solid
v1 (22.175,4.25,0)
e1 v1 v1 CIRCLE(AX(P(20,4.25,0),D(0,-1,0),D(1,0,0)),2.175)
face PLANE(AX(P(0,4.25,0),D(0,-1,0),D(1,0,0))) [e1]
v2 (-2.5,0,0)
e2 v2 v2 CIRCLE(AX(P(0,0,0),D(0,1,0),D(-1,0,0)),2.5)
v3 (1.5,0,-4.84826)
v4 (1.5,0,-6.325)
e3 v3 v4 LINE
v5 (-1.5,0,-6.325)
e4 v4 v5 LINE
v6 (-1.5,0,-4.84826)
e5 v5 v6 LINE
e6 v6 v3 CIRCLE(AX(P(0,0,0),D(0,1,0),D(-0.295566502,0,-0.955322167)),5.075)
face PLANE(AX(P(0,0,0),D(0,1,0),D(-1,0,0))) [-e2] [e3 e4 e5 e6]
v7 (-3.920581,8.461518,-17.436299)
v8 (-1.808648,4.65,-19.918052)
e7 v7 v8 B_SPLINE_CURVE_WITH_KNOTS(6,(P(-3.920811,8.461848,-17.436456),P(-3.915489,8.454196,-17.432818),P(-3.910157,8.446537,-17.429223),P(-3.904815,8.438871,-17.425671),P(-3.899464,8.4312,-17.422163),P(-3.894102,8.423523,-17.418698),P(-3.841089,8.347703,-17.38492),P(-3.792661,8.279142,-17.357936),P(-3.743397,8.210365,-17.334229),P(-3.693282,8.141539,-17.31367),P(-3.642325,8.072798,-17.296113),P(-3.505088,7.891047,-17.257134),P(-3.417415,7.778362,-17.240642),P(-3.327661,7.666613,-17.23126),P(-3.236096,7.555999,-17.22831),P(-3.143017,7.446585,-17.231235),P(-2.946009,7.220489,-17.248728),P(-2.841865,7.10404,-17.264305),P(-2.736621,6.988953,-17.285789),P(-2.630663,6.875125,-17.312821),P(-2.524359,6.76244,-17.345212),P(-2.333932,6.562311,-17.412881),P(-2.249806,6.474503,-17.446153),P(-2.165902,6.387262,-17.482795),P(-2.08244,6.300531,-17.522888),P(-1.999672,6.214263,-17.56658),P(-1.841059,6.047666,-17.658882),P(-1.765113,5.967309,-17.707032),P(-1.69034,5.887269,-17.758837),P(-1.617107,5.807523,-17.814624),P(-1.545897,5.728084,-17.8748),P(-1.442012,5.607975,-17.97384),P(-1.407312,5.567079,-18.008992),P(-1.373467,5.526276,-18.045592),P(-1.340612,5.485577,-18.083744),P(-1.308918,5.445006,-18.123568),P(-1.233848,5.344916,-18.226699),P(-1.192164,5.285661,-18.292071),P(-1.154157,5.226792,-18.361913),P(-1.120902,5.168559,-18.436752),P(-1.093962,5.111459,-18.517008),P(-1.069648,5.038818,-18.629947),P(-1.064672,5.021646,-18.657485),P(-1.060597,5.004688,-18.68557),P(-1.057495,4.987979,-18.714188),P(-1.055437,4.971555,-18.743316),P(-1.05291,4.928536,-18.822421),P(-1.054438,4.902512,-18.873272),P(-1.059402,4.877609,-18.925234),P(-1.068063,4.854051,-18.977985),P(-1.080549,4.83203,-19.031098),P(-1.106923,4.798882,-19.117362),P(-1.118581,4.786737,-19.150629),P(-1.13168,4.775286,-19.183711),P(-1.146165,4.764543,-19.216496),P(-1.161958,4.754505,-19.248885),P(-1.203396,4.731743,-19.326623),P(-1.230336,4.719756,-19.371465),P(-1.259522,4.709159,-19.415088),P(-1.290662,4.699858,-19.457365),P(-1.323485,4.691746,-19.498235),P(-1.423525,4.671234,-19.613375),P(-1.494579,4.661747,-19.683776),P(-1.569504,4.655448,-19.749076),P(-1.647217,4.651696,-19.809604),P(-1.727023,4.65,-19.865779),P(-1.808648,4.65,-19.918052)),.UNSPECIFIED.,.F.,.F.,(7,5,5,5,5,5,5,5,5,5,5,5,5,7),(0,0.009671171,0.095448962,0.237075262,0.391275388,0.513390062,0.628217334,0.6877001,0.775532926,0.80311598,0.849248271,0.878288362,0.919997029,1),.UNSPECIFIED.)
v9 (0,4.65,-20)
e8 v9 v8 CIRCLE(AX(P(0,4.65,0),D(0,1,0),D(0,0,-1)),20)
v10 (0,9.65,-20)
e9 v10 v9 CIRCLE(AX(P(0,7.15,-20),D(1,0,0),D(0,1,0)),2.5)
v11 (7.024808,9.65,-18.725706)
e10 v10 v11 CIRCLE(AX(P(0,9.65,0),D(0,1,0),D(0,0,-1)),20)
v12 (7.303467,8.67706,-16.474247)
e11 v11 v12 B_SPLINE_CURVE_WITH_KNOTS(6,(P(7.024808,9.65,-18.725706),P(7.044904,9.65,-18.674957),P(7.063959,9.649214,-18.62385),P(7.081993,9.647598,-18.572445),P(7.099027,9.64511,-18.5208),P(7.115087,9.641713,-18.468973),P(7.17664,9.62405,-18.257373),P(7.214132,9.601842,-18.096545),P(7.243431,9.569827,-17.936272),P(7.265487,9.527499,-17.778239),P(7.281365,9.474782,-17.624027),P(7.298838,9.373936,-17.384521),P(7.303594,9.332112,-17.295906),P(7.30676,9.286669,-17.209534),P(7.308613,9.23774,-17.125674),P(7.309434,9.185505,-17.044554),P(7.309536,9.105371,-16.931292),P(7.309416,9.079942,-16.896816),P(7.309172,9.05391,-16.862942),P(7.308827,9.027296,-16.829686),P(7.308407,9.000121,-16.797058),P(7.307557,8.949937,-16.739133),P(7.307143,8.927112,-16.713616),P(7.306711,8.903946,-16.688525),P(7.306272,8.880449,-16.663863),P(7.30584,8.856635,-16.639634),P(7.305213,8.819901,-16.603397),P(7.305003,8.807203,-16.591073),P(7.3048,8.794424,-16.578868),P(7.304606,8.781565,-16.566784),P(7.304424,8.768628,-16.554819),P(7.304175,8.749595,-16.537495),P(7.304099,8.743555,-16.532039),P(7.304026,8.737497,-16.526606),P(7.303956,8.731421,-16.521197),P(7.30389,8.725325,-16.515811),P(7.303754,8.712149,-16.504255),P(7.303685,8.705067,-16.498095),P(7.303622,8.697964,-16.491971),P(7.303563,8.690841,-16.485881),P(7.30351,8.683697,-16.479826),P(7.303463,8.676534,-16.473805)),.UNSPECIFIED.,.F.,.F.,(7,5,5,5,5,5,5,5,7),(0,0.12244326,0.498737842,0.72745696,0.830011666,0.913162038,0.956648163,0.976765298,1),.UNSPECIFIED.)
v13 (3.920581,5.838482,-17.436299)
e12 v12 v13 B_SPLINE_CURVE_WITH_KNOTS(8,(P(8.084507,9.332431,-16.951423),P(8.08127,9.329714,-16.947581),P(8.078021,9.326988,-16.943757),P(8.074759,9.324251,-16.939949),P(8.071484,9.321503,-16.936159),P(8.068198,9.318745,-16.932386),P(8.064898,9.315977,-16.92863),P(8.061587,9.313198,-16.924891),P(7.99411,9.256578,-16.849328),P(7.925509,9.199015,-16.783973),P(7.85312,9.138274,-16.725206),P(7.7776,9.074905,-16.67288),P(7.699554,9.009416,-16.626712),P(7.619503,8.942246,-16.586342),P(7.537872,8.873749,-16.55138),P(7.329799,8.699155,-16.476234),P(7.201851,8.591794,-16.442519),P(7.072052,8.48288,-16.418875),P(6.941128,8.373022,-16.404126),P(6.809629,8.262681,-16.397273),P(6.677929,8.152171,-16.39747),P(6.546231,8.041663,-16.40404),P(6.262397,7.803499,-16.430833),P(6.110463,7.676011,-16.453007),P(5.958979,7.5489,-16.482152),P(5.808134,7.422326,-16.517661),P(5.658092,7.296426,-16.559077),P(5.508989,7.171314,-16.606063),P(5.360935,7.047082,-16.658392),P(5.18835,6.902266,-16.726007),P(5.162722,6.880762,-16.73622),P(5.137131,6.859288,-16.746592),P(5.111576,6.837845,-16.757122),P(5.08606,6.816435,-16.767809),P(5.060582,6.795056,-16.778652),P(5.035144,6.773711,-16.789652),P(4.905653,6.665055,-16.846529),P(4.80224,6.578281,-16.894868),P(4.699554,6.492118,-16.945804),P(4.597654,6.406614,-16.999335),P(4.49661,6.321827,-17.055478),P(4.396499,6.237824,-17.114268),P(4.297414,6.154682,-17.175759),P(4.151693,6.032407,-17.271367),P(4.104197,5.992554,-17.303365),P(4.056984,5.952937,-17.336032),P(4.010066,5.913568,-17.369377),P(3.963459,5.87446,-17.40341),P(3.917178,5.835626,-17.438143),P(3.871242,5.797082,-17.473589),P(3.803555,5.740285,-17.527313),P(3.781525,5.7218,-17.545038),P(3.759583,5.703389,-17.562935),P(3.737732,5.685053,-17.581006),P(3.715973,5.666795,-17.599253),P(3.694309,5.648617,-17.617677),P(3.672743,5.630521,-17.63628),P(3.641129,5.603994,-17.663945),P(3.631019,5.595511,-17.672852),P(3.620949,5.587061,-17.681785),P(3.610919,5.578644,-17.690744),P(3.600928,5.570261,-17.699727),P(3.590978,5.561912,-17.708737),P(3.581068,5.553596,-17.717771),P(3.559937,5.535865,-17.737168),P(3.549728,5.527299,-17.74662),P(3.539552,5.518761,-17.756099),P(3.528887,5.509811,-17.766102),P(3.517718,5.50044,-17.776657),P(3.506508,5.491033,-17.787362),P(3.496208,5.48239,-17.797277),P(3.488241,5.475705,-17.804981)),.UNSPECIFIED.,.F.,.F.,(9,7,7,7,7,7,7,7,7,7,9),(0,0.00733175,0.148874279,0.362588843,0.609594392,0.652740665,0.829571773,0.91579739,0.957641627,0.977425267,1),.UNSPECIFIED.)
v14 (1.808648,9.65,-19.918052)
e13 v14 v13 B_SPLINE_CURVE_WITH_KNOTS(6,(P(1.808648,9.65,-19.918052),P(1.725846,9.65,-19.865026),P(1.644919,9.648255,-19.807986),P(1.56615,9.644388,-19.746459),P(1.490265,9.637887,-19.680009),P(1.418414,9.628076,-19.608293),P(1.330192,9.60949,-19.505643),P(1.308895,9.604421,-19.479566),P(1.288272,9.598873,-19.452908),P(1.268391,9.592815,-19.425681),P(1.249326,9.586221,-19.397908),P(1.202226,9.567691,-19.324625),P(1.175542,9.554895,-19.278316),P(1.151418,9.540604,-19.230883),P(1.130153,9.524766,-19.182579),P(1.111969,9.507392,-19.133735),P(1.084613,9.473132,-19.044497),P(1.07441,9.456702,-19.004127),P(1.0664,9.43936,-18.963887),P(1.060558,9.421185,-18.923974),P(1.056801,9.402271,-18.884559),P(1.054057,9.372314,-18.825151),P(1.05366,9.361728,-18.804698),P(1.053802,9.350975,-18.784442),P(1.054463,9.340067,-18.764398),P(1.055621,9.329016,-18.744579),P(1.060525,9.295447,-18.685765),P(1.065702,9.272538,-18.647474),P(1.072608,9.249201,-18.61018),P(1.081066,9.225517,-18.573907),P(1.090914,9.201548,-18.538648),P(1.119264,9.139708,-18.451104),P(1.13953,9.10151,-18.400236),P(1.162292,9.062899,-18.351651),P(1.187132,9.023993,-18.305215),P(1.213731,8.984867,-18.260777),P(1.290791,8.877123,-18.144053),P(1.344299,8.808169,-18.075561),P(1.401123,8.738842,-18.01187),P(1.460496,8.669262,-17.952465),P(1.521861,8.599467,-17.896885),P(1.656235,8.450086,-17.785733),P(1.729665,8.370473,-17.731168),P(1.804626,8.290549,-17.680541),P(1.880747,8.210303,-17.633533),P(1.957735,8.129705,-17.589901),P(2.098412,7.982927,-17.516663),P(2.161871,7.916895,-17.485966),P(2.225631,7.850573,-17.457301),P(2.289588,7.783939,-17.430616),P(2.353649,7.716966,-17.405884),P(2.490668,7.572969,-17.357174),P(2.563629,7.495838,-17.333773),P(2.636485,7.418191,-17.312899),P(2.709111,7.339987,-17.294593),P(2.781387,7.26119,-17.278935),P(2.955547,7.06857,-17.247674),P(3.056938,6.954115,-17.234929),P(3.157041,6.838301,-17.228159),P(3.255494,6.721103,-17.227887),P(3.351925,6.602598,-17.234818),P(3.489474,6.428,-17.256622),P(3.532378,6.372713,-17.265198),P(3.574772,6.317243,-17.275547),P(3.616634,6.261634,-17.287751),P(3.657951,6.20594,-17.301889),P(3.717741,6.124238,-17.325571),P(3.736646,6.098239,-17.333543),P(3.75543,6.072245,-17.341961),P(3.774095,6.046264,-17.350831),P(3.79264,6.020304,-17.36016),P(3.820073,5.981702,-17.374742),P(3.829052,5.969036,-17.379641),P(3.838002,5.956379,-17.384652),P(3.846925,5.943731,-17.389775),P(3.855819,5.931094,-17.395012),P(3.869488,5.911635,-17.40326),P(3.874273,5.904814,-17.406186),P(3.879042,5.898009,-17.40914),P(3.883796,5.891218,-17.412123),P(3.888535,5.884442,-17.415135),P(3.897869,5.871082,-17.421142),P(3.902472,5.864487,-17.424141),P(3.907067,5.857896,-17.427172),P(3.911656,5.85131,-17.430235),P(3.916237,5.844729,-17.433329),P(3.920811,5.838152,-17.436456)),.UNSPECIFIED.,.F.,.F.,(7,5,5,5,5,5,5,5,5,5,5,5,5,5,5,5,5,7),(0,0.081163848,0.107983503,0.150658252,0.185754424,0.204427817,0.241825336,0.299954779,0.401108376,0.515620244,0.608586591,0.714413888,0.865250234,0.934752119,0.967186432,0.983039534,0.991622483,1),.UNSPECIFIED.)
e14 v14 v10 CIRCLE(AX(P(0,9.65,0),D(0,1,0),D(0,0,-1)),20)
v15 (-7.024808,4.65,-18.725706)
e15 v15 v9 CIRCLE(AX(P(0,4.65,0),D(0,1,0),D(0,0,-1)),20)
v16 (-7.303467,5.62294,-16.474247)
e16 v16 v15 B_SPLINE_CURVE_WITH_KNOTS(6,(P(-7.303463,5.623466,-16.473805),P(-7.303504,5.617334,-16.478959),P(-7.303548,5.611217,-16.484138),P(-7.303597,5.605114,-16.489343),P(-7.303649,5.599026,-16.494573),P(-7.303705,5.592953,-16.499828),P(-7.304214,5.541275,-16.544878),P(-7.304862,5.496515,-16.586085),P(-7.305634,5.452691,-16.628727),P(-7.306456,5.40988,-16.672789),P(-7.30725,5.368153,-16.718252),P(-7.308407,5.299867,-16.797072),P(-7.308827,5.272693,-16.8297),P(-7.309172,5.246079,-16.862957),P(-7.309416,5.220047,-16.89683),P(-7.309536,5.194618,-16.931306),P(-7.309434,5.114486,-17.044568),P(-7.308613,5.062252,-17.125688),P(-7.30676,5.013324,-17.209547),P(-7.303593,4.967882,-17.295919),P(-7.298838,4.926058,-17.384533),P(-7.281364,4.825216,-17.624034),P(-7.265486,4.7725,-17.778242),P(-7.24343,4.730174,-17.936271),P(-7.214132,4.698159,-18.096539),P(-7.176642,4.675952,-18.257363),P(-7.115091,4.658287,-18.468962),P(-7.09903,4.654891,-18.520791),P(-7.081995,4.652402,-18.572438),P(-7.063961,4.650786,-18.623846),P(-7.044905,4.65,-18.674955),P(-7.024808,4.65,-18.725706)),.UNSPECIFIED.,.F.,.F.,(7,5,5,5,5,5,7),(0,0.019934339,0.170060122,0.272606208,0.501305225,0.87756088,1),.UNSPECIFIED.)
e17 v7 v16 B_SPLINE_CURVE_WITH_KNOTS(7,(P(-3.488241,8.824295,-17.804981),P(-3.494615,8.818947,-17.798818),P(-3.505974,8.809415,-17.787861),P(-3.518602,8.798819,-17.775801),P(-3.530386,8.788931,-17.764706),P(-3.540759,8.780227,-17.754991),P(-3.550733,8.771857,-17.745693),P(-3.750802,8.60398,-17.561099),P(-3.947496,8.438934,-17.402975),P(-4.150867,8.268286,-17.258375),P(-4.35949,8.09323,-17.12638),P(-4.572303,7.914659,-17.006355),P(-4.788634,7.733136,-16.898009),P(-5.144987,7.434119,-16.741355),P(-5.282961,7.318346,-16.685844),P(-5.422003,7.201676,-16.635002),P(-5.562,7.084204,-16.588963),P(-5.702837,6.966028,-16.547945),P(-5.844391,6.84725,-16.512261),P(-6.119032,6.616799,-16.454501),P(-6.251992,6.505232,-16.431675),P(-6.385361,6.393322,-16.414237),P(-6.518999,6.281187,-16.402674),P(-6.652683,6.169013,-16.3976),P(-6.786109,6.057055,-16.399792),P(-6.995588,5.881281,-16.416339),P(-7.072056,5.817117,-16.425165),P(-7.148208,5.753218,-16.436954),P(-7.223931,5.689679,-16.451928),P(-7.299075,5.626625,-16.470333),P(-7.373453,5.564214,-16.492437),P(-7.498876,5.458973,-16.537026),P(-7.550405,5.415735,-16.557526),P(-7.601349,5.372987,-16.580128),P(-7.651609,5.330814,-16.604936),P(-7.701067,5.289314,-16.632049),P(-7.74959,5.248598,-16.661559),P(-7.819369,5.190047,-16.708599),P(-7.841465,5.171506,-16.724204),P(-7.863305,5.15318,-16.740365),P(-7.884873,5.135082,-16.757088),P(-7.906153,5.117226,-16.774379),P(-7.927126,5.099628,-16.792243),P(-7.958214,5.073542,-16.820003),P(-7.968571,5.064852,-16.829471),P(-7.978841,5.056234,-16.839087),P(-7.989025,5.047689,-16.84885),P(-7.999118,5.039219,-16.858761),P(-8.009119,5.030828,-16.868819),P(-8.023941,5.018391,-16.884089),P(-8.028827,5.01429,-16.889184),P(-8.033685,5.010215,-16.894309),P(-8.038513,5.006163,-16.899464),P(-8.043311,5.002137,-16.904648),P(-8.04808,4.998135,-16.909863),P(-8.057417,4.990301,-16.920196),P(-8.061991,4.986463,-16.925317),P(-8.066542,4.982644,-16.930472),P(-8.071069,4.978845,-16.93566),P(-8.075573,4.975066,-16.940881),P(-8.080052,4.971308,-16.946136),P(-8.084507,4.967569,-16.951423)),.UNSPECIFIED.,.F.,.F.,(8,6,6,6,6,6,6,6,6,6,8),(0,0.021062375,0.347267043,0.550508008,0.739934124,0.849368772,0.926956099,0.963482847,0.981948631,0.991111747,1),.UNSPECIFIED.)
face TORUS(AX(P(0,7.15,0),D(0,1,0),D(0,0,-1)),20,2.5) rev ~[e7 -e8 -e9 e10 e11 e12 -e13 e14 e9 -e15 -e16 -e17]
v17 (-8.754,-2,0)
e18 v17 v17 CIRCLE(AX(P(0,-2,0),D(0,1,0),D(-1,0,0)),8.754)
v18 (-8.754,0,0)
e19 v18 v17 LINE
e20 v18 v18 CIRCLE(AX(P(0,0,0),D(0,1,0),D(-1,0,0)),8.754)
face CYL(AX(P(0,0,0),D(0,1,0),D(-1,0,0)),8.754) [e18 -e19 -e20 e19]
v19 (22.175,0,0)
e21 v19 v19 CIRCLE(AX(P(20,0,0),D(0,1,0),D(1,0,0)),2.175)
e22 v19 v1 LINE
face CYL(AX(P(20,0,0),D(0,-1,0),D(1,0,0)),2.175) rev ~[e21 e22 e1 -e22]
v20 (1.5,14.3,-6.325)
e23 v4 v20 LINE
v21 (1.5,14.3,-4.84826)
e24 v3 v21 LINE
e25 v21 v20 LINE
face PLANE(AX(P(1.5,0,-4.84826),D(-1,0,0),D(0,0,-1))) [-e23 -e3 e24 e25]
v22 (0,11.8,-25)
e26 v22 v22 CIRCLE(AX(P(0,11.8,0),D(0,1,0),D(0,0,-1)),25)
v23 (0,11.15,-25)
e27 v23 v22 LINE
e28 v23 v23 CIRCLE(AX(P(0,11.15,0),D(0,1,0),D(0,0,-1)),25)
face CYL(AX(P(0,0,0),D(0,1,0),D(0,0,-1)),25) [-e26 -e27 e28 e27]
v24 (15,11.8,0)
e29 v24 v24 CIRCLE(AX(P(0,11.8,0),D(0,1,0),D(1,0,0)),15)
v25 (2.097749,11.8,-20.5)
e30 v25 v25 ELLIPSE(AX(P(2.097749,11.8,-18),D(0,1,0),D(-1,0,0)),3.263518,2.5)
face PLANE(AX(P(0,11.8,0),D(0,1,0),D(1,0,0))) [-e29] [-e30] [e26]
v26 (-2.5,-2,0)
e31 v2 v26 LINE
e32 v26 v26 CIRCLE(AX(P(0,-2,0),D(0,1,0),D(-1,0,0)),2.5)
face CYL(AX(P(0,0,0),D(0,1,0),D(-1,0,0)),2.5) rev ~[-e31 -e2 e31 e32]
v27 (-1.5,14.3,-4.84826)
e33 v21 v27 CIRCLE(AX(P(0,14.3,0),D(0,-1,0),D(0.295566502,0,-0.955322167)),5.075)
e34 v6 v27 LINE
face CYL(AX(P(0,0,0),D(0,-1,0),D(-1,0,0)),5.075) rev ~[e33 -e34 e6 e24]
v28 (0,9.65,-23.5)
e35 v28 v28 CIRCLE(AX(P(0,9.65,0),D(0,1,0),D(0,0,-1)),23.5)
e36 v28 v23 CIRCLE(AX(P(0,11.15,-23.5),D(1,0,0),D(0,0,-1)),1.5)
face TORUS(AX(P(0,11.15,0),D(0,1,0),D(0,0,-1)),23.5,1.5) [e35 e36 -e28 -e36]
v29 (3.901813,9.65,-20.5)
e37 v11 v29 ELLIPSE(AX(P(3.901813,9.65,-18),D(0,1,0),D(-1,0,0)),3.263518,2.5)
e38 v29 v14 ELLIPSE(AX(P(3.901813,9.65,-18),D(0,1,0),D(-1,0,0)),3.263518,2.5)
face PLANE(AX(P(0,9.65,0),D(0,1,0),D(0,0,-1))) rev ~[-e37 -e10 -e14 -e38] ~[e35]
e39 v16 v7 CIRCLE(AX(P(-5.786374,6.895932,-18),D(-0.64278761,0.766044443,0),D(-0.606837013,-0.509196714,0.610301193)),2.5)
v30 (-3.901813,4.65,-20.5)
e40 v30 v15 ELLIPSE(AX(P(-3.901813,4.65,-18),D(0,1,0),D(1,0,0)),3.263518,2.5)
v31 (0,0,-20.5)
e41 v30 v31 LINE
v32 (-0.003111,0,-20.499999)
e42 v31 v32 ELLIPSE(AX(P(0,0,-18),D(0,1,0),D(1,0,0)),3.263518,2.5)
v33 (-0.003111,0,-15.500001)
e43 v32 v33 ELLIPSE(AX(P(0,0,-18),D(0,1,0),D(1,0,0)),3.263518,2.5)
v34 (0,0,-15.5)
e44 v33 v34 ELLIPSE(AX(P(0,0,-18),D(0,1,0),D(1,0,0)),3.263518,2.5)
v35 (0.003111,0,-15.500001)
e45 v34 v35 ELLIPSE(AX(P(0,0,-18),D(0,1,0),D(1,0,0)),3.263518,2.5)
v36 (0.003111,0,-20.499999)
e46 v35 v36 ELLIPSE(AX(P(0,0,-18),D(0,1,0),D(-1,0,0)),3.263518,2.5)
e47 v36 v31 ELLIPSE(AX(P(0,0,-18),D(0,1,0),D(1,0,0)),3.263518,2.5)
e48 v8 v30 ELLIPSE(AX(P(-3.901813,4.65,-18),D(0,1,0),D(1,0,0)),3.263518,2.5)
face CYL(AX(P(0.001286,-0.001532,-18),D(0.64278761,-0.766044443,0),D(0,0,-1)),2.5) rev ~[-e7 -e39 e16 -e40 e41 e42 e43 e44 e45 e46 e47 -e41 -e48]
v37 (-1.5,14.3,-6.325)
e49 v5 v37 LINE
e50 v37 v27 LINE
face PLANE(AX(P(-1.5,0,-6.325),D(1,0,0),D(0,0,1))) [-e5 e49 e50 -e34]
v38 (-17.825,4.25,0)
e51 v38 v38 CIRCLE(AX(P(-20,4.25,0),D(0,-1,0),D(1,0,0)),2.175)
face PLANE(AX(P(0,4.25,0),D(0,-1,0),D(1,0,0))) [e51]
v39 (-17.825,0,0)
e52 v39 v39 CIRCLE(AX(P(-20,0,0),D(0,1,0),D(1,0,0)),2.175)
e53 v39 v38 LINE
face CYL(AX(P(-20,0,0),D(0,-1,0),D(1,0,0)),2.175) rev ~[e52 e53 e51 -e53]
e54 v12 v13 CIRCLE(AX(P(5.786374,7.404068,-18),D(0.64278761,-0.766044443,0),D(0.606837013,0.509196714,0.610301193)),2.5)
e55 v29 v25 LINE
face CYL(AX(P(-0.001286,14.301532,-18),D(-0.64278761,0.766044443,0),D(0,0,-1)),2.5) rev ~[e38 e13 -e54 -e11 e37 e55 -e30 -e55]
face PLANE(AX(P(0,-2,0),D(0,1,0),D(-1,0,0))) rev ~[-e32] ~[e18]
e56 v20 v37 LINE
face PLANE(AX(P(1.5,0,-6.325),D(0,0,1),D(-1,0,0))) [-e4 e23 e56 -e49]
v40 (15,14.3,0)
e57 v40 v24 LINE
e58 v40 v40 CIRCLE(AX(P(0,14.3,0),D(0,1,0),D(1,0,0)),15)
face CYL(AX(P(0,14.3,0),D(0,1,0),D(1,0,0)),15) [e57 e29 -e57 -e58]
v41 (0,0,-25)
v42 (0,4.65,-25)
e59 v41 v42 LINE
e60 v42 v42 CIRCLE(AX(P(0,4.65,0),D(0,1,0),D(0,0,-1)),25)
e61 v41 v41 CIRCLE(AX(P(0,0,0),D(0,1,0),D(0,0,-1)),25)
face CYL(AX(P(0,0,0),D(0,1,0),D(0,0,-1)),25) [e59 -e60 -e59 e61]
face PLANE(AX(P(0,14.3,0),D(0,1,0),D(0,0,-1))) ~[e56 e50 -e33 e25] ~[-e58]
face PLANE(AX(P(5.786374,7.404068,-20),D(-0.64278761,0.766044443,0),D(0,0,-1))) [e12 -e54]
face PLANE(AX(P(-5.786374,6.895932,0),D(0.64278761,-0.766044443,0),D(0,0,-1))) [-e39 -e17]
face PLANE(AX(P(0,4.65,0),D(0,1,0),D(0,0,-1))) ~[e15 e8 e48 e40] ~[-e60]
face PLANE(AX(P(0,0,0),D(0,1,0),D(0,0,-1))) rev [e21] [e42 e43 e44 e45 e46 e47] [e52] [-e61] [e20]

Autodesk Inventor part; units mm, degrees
ref_plane "YZ Plane" through (0, 0, 0) normal (1, 0, 0) x (0, 1, 0)
sketch "Sketch1" plane through (0, 0, 0) normal (0, 1, 0) x (-1, 0, 0)
  circle A0 centre (0, 0) radius 5.075
  circle A1 centre (0, 0) radius 20
  line L0 (1.5, -3.825) -> (-1.5, -3.825)
  line L1 (-1.5, -3.825) -> (-1.5, -6.325)
  line L2 (-1.5, -6.325) -> (1.5, -6.325)
  line L3 (1.5, -6.325) -> (1.5, -3.825)
  line L4 (1.5, -3.825) -> (-1.5, -6.325) construction
  line L5 (-1.5, -3.825) -> (1.5, -6.325) construction
  circle A2 centre (0, 0) radius 2.5
  circle A3 centre (0, 0) radius 8.754
  point P0 (0, -5.075)
  point P1 (-1.5, -4.8483)
  point P2 (1.5, -4.8483)
  dimension "d0" = 10.15
  dimension "d1" = 40
  dimension "d2" = 1.25
  dimension "d3" = 3
  dimension "d17" = 5
extrude "Extrusion1" add sketch "Sketch1" along normal blind 14.3 contours A1 | A3
sketch "Sketch2" plane through (0, 0, 0) normal (1, 0, 0) x (0, 1, 0)
  line L0 (0, 0) -> (14.3, 0)
  line L1 (14.3, 0) -> (14.3, -20)
  line L2 (14.3, -20) -> (0, -20) construction
  line L3 (0, -20) -> (0, 0)
  line L4 (0, -20) -> (14.3, -20) construction
  line L5 (14.3, -20) -> (14.3, -20.0661)
  line L6 (0, -20) -> (14.3, -20) projected
  circle A0 centre (7.15, -20) radius 2.5
  line L7 (9.65, -20) -> (4.65, -20)
  line L8 (4.65, -20) -> (4.65, -28)
  line L9 (4.65, -28) -> (9.65, -28)
  line L10 (9.65, -28) -> (9.65, -20)
  line L11 (14.3, -20) -> (0, -20)
  line L12 (0, -20) -> (0, -25)
  line L13 (0, -25) -> (14.3, -25)
  line L14 (14.3, -25) -> (14.3, -20)
  point P0 (4.65, -25)
  point P1 (14.3, -20)
  point P2 (9.65, -25)
  point P3 (14.3, -20)
  point P4 (14.3, -20)
  dimension "d22" = 5
  dimension "d7" = 20
  dimension "d10" = 14.3
  dimension "d23" = 8
  dimension "d31" = 5
  dimension "d41" = 14.3
  dimension "d42" = 5
revolve "Revolution1" add sketch "Sketch2" angle 360 about axis through (0, 0, 0) along (0, 1, 0) contours L6 L8 L13 L12 | L5 L14 L13 L10 L6
extrude "Extrusion3" add sketch "Sketch1" against normal blind 2 contours A0 L3 L0 L1 | L1 L0 L3 A0 | A0 L3 L2 L1 | A3
revolve "Revolution4" cut sketch "Sketch2" angle 360 about axis through (0, 0, 0) along (0, 1, 0) contours A0 L6 | L6 A0
sketch "Sketch3" plane through (0, 0, 0) normal (0, -1, 0) x (1, 0, 0)
  line L0 (0, 0) -> (0, -22)
  dimension "d25" = 22
ref_plane "Work Plane1" through (0, 0, 0) normal (0.6427876, -0.7660444, 0) x (0, 0, -1)
sketch "Sketch4" plane through (0, 0, 0) normal (0.6427876, -0.7660444, 0) x (0, 0, -1)
  ellipse E0 centre (0, 2.7318) end of major axis (22, 2.7318) minor radius 16.853 projected
  line L0 (0, 0) -> (18, 0)
  circle A0 centre (18, 0) radius 2.5
  dimension "d27" = 18
  dimension "d28" = 5
extrude "Extrusion4" cut sketch "Sketch4" against normal blind 9 contours A0
extrude "Extrusion5" cut sketch "Sketch4" along normal blind 7 contours A0
ref_plane "Work Plane2" through (0, 14.3, -20) normal (-0.6427876, 0.7660444, 0) x (0, 0, -1)
sketch "Sketch5" plane through (0, 14.3, -20) normal (-0.6427876, 0.7660444, 0) x (0, 0, -1)
  ellipse E0 centre (-20, 0) end of major axis (-25.075, 0) minor radius 3.8877 (-15.1517, 1.1491) -> (-15.1517, -1.1491) ccw projected
  line L0 (-20, 0) -> (-2, 0)
  circle A0 centre (-2, 0) radius 2.5
  point P0 (-20, 9.1919)
  dimension "d36" = 5
  dimension "d56" = 18
extrude "Extrusion6" cut sketch "Sketch5" against normal blind 9
extrude "Extrusion7" cut sketch "Sketch5" along normal blind 8
extrude "Extrusion8" cut sketch "Sketch1" along normal through all contours A0 L3 L0 L1 | L1 L0 L3 A0 | A0 L3 L2 L1
sketch "Sketch6" plane through (0, 14.3, 0) normal (0, 1, 0) x (1, 0, 0)
  circle A0 centre (0, 0) radius 15
  circle A1 centre (0, 0) radius 35.6972
  dimension "d45" = 30
extrude "Extrusion9" cut sketch "Sketch6" against normal blind 2.5
sketch "Sketch7" plane through (0, 0, 0) normal (0, -1, 0) x (1, 0, 0)
  circle A0 centre (0, 0) radius 2.5 projected
  circle A1 centre (0, 0) radius 20
  line L0 (24, -7.5) -> (-24, -7.5)
  line L1 (-24, -7.5) -> (-24, 7.5)
  line L2 (-24, 7.5) -> (24, 7.5)
  line L3 (24, 7.5) -> (24, -7.5)
  line L4 (24, -7.5) -> (-24, 7.5) construction
  line L5 (-24, -7.5) -> (24, 7.5) construction
  circle A2 centre (0, 0) radius 11
  circle A3 centre (20, 0) radius 2.175
  circle A4 centre (-20, 0) radius 2.175
  dimension "d48" = 40
  dimension "d49" = 48
  dimension "d50" = 15
  dimension "d51" = 22
  dimension "d52" = 4.35
  dimension "d53" = 4.35
extrude "Extrusion10" cut sketch "Sketch7" against normal blind 4.25 contours A1 A3 | A1 A3 | A4 A1 | A1 A4
fillet "Fillet1" radius 1.5 1 edges at (0, 9.65, 25)
properties part number "spool_temp"
